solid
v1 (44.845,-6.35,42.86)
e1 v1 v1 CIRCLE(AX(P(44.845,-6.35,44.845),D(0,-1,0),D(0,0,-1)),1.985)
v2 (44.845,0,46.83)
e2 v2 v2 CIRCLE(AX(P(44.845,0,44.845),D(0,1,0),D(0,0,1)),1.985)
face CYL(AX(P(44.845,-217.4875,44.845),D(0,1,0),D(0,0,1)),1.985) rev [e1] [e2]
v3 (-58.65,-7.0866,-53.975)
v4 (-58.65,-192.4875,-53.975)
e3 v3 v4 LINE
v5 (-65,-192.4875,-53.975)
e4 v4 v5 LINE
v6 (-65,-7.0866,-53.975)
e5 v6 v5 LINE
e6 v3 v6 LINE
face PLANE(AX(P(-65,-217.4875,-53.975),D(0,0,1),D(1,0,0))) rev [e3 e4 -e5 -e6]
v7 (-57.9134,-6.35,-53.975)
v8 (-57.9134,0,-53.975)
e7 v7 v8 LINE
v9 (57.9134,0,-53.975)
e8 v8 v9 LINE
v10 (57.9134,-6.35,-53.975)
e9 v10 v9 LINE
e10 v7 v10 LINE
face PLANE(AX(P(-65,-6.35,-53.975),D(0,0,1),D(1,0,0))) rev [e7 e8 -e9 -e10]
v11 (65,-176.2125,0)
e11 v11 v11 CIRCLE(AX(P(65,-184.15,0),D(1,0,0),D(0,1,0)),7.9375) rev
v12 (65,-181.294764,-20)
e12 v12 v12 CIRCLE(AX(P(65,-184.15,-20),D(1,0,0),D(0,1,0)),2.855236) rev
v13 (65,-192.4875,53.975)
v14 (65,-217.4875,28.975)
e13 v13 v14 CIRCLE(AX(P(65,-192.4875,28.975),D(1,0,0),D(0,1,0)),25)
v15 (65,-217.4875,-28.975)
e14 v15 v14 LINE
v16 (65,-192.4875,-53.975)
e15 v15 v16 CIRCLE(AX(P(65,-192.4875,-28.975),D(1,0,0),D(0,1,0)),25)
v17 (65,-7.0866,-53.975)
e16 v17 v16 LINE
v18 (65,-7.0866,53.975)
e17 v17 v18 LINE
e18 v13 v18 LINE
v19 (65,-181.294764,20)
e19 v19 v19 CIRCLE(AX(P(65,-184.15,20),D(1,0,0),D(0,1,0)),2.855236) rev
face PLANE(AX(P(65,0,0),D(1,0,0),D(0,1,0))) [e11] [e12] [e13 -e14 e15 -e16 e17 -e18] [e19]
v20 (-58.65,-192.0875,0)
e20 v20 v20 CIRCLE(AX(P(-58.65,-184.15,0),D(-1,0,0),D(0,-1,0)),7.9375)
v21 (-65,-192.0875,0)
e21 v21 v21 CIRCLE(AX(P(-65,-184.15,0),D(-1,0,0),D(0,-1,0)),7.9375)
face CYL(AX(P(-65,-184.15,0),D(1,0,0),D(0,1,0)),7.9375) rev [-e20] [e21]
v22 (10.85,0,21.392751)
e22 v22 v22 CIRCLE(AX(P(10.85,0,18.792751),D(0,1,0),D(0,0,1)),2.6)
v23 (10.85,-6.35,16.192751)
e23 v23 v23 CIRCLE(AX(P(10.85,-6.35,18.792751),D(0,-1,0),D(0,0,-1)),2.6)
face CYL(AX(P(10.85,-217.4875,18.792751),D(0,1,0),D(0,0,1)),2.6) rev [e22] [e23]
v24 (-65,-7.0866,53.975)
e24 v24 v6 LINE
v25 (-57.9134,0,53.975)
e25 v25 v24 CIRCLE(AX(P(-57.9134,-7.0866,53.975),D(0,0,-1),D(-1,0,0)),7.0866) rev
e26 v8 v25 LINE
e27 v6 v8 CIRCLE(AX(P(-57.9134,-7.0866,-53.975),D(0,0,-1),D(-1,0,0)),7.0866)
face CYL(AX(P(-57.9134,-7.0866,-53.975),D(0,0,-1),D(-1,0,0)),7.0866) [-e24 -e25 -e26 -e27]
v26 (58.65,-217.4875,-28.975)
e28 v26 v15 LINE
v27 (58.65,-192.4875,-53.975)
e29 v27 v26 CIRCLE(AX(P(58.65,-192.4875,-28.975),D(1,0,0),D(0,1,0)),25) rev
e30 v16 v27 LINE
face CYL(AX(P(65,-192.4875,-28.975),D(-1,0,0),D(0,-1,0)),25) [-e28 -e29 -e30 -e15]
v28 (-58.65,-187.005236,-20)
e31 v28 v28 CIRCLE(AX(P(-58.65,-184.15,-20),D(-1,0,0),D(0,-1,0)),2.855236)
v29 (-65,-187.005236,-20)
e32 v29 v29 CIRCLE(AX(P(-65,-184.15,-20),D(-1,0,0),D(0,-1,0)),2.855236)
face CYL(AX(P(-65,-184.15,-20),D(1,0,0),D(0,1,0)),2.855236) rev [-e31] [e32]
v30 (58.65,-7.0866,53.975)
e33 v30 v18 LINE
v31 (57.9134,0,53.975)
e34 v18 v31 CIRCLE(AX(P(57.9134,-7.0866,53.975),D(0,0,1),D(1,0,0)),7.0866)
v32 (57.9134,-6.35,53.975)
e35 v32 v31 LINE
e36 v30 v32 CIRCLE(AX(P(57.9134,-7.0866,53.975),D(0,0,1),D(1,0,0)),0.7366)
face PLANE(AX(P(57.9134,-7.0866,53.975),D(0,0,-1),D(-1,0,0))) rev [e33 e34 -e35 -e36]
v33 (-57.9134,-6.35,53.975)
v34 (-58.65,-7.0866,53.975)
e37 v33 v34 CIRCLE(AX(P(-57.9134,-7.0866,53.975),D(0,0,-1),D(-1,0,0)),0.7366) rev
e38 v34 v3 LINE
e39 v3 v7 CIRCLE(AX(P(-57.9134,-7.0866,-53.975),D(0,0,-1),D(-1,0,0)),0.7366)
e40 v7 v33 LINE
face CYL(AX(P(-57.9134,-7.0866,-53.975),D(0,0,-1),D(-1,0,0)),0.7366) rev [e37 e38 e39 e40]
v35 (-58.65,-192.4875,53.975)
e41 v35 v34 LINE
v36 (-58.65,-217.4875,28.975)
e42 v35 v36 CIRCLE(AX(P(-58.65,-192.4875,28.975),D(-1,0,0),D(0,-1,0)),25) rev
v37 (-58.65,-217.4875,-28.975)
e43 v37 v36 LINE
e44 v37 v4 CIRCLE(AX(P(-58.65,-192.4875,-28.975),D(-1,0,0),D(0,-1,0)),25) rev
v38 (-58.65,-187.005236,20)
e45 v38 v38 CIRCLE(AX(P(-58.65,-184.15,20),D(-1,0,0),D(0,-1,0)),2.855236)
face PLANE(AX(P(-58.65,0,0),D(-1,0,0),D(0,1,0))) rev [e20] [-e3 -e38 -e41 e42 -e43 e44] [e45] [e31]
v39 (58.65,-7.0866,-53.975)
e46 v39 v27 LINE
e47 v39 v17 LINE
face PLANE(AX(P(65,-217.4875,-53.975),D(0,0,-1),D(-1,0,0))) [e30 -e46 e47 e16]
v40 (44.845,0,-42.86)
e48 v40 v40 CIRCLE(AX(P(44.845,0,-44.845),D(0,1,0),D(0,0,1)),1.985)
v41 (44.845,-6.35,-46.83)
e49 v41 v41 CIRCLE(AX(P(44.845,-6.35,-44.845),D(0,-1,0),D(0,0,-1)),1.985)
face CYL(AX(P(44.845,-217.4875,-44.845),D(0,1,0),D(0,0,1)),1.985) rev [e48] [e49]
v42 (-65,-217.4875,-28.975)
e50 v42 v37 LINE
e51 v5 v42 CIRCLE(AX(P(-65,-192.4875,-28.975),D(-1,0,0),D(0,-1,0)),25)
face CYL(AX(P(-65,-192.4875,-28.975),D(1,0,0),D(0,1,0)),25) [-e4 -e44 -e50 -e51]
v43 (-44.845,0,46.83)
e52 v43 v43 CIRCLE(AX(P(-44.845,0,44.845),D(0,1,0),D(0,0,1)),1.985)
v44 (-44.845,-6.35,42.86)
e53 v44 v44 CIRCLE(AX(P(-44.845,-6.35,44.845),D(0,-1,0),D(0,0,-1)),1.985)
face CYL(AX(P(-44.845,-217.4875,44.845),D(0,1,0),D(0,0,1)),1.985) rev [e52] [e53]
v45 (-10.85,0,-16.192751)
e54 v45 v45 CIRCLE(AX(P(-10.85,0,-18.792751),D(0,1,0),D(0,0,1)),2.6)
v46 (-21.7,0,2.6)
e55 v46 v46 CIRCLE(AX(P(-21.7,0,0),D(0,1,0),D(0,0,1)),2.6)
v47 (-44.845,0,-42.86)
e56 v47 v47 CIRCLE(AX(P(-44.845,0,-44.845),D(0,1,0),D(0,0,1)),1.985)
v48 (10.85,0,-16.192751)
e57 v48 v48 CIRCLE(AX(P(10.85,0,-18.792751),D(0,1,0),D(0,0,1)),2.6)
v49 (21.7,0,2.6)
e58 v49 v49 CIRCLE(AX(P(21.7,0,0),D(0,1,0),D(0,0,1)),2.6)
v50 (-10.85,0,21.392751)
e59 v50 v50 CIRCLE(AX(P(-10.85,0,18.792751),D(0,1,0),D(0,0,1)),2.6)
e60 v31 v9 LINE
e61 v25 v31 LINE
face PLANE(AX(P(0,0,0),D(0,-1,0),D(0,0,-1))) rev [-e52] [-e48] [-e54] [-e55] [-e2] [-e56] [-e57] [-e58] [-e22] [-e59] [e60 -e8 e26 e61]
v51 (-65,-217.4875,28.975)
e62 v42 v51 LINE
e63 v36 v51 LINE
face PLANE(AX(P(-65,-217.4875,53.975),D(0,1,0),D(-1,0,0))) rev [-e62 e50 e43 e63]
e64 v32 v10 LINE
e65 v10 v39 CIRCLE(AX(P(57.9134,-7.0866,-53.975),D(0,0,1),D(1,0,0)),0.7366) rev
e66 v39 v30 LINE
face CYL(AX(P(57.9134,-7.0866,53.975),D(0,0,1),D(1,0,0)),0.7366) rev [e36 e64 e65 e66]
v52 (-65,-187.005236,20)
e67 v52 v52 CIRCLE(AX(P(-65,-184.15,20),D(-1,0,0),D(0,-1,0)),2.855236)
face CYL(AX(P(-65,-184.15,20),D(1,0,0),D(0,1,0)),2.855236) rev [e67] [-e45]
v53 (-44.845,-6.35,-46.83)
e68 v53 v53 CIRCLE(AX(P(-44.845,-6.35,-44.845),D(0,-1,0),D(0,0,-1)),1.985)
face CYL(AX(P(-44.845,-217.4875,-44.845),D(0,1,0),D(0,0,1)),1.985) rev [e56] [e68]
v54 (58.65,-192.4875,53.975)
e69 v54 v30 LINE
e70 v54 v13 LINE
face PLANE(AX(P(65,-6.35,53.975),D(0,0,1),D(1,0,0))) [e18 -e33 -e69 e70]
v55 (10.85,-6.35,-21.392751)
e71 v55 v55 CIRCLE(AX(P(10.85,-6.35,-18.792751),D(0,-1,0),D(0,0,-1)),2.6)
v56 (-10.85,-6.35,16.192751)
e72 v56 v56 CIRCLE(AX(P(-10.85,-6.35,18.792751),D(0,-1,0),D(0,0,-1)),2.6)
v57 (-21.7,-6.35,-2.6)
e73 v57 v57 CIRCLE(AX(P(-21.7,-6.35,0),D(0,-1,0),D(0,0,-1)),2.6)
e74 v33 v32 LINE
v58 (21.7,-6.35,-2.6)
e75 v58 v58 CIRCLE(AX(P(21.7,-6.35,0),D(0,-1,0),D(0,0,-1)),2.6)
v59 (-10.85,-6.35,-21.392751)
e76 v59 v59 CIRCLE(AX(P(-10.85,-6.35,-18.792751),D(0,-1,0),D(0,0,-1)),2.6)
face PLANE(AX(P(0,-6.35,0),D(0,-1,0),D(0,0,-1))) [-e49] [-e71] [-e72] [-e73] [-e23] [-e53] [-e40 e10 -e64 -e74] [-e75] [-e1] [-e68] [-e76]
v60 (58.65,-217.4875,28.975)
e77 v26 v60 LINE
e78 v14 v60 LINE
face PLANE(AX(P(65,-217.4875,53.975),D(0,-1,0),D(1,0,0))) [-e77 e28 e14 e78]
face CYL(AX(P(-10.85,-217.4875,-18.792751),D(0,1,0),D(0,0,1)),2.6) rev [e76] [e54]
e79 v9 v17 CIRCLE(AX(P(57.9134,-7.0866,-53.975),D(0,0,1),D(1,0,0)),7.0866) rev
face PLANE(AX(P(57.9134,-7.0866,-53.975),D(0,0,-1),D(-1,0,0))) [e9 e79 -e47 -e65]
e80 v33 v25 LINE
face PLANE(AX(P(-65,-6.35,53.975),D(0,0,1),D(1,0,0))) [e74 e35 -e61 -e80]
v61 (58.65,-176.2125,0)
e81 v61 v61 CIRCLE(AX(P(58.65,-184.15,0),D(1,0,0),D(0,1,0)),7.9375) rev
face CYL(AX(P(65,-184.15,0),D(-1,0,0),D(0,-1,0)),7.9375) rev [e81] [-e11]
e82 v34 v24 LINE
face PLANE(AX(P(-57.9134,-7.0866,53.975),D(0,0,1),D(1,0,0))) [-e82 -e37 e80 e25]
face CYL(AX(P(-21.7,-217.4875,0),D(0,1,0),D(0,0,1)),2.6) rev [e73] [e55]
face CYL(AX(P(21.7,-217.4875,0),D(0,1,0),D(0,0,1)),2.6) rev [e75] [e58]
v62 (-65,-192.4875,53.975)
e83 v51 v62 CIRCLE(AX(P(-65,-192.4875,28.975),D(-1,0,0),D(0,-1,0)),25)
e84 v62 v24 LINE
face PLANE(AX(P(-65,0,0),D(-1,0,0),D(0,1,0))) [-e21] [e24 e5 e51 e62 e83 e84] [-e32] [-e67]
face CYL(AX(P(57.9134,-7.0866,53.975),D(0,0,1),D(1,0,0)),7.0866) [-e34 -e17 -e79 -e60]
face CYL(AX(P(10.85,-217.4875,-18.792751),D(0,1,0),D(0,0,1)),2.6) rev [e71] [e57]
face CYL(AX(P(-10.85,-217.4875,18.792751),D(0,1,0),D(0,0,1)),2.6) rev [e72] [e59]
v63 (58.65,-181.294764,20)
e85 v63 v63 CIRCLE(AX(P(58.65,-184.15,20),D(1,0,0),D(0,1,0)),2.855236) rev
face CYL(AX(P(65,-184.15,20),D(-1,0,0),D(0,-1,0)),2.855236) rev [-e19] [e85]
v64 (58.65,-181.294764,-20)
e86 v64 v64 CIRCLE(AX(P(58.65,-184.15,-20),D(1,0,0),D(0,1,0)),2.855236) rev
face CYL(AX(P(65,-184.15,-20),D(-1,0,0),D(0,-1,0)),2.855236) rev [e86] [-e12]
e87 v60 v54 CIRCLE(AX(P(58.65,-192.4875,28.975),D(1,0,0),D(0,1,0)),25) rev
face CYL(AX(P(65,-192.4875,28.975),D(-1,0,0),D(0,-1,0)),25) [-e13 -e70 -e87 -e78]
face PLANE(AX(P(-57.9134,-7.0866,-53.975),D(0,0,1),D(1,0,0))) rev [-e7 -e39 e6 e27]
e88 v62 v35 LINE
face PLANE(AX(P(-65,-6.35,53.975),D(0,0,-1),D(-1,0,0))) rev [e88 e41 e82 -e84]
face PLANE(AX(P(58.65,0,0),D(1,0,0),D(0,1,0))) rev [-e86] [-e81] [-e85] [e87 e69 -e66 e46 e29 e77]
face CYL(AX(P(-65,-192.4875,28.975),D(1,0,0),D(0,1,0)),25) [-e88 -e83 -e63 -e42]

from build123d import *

# Parameters (mm, degrees)
SKETCH3_W                    = 130
SKETCH3_H                    = 107.95
BASE_FLANGE1_DEPTH           = 6.35
EDGE_FLANGE1_STRIP_W         = 26.8732
EDGE_FLANGE1_STRIP_H         = 6.35
EDGE_FLANGE1_STRIP_CUT_DEPTH = 107.95
EDGE_FLANGE1_DEPTH           = 107.95
EDGE_FLANGE1_PROFILE_W       = 107.95
EDGE_FLANGE1_PROFILE_H       = 210.4009
EDGE_FLANGE1_PROFILE_R       = 2.855235605
EDGE_FLANGE1_PROFILE_R_2     = 7.9375
EDGE_FLANGE1_FLAT_DEPTH      = 6.35
FILLET1_R                    = 25
SKETCH13_R                   = 2.6
FLANGE_COUPLING_HOLES_DEPTH  = 234.321909133
SKETCH15_R                   = 1.985
CUT_EXTRUDE1_DEPTH           = 234.321909133


# Sheet-metal steps are written as plain solids
with BuildPart() as part:
    # Sketch3 → Base-Flange1 (new body)
    with BuildSketch(Plane(origin=(0, 0, 0), x_dir=(1, 0, 0), z_dir=(0, 1, 0))):
        Rectangle(SKETCH3_W, SKETCH3_H)
    extrude(amount=-BASE_FLANGE1_DEPTH)

    # Edge-Flange1 strip (across the edge) → Edge-Flange1 strip cut (cut)
    with BuildSketch(Plane(origin=(65, -6.35, -53.975), x_dir=(-1, 0, 0), z_dir=(0, 0, 1))):
        with Locations((-6.35, -3.175)):
            Rectangle(EDGE_FLANGE1_STRIP_W, EDGE_FLANGE1_STRIP_H)
    edge_flange1_strip_cut = extrude(amount=EDGE_FLANGE1_STRIP_CUT_DEPTH, mode=Mode.SUBTRACT)

    # Edge-Flange1 bend section (across the edge) → Edge-Flange1 (add)
    with BuildSketch(Plane(origin=(65, -6.35, -53.975), x_dir=(-1, 0, 0), z_dir=(0, 0, 1))):
        with BuildLine():
            Line((0, 0.7366), (6.35, 0.7366))
            ThreePointArc((6.35, 0.7366), (6.565745145, 0.215745145), (7.0866, 0))
            Line((7.0866, 0), (7.0866, -6.35))
            ThreePointArc((7.0866, -6.35), (2.075617084, -4.274382916), (0, 0.7366))
        make_face()
    edge_flange1 = extrude(amount=EDGE_FLANGE1_DEPTH)

    # Edge-Flange1 profile (on flange) → Edge-Flange1 flat (add)
    with BuildSketch(Plane(origin=(65, -6.35, 0), x_dir=(0, 0, -1), z_dir=(-1, 0, 0))):
        with Locations((0, 105.93705)):
            Rectangle(EDGE_FLANGE1_PROFILE_W, EDGE_FLANGE1_PROFILE_H)
        with Locations((20, 177.8)):
            Circle(EDGE_FLANGE1_PROFILE_R, mode=Mode.SUBTRACT)
        with Locations((0, 177.8)):
            Circle(EDGE_FLANGE1_PROFILE_R_2, mode=Mode.SUBTRACT)
        with Locations((-20, 177.8)):
            Circle(EDGE_FLANGE1_PROFILE_R, mode=Mode.SUBTRACT)
    edge_flange1_flat = extrude(amount=EDGE_FLANGE1_FLAT_DEPTH)

    # Mirror1: Edge-Flange1 strip cut, Edge-Flange1, Edge-Flange1 flat across plane
    add(edge_flange1_strip_cut.mirror(Plane(origin=(0, 0, 0), x_dir=(0, 0, 1), z_dir=(1, 0, 0))), mode=Mode.SUBTRACT)
    add(edge_flange1.mirror(Plane(origin=(0, 0, 0), x_dir=(0, 0, 1), z_dir=(1, 0, 0))))
    add(edge_flange1_flat.mirror(Plane(origin=(0, 0, 0), x_dir=(0, 0, 1), z_dir=(1, 0, 0))))

    # Fillet1
    fillet1_edges = [part.edges().sort_by_distance(p)[0] for p in [
        (61.825, -217.4875, -53.975),
        (61.825, -217.4875, 53.975),
        (-61.825, -217.4875, 53.975),
        (-61.825, -217.4875, -53.975),
    ]]
    fillet(fillet1_edges, radius=FILLET1_R)

    # Sketch13 → Flange Coupling Holes (cut, through all)
    with BuildSketch(Plane(origin=(0, 0, 0), x_dir=(1, 0, 0), z_dir=(0, 1, 0))):
        with Locations(Location((-21.7, 0, 0), (0, 0, 270))):
            Circle(SKETCH13_R)
        with Locations(Location((-10.85, 18.792751262, 0), (0, 0, 270))):
            Circle(SKETCH13_R)
        with Locations(Location((10.85, 18.792751262, 0), (0, 0, 270))):
            Circle(SKETCH13_R)
        with Locations(Location((21.7, 0, 0), (0, 0, 270))):
            Circle(SKETCH13_R)
        with Locations(Location((10.85, -18.792751262, 0), (0, 0, 270))):
            Circle(SKETCH13_R)
        with Locations(Location((-10.85, -18.792751262, 0), (0, 0, 270))):
            Circle(SKETCH13_R)
    extrude(amount=-FLANGE_COUPLING_HOLES_DEPTH, mode=Mode.SUBTRACT)

    # Sketch15 → Cut-Extrude1 (cut, through all)
    with BuildSketch(Plane(origin=(0, 0, 0), x_dir=(1, 0, 0), z_dir=(0, 1, 0))):
        with Locations(Location((-44.845, 44.845, 0), (0, 0, 270))):
            Circle(SKETCH15_R)
        with Locations(Location((44.845, 44.845, 0), (0, 0, 270))):
            Circle(SKETCH15_R)
        with Locations(Location((44.845, -44.845, 0), (0, 0, 270))):
            Circle(SKETCH15_R)
        with Locations(Location((-44.845, -44.845, 0), (0, 0, 270))):
            Circle(SKETCH15_R)
    extrude(amount=-CUT_EXTRUDE1_DEPTH, mode=Mode.SUBTRACT)


solid = part.part
